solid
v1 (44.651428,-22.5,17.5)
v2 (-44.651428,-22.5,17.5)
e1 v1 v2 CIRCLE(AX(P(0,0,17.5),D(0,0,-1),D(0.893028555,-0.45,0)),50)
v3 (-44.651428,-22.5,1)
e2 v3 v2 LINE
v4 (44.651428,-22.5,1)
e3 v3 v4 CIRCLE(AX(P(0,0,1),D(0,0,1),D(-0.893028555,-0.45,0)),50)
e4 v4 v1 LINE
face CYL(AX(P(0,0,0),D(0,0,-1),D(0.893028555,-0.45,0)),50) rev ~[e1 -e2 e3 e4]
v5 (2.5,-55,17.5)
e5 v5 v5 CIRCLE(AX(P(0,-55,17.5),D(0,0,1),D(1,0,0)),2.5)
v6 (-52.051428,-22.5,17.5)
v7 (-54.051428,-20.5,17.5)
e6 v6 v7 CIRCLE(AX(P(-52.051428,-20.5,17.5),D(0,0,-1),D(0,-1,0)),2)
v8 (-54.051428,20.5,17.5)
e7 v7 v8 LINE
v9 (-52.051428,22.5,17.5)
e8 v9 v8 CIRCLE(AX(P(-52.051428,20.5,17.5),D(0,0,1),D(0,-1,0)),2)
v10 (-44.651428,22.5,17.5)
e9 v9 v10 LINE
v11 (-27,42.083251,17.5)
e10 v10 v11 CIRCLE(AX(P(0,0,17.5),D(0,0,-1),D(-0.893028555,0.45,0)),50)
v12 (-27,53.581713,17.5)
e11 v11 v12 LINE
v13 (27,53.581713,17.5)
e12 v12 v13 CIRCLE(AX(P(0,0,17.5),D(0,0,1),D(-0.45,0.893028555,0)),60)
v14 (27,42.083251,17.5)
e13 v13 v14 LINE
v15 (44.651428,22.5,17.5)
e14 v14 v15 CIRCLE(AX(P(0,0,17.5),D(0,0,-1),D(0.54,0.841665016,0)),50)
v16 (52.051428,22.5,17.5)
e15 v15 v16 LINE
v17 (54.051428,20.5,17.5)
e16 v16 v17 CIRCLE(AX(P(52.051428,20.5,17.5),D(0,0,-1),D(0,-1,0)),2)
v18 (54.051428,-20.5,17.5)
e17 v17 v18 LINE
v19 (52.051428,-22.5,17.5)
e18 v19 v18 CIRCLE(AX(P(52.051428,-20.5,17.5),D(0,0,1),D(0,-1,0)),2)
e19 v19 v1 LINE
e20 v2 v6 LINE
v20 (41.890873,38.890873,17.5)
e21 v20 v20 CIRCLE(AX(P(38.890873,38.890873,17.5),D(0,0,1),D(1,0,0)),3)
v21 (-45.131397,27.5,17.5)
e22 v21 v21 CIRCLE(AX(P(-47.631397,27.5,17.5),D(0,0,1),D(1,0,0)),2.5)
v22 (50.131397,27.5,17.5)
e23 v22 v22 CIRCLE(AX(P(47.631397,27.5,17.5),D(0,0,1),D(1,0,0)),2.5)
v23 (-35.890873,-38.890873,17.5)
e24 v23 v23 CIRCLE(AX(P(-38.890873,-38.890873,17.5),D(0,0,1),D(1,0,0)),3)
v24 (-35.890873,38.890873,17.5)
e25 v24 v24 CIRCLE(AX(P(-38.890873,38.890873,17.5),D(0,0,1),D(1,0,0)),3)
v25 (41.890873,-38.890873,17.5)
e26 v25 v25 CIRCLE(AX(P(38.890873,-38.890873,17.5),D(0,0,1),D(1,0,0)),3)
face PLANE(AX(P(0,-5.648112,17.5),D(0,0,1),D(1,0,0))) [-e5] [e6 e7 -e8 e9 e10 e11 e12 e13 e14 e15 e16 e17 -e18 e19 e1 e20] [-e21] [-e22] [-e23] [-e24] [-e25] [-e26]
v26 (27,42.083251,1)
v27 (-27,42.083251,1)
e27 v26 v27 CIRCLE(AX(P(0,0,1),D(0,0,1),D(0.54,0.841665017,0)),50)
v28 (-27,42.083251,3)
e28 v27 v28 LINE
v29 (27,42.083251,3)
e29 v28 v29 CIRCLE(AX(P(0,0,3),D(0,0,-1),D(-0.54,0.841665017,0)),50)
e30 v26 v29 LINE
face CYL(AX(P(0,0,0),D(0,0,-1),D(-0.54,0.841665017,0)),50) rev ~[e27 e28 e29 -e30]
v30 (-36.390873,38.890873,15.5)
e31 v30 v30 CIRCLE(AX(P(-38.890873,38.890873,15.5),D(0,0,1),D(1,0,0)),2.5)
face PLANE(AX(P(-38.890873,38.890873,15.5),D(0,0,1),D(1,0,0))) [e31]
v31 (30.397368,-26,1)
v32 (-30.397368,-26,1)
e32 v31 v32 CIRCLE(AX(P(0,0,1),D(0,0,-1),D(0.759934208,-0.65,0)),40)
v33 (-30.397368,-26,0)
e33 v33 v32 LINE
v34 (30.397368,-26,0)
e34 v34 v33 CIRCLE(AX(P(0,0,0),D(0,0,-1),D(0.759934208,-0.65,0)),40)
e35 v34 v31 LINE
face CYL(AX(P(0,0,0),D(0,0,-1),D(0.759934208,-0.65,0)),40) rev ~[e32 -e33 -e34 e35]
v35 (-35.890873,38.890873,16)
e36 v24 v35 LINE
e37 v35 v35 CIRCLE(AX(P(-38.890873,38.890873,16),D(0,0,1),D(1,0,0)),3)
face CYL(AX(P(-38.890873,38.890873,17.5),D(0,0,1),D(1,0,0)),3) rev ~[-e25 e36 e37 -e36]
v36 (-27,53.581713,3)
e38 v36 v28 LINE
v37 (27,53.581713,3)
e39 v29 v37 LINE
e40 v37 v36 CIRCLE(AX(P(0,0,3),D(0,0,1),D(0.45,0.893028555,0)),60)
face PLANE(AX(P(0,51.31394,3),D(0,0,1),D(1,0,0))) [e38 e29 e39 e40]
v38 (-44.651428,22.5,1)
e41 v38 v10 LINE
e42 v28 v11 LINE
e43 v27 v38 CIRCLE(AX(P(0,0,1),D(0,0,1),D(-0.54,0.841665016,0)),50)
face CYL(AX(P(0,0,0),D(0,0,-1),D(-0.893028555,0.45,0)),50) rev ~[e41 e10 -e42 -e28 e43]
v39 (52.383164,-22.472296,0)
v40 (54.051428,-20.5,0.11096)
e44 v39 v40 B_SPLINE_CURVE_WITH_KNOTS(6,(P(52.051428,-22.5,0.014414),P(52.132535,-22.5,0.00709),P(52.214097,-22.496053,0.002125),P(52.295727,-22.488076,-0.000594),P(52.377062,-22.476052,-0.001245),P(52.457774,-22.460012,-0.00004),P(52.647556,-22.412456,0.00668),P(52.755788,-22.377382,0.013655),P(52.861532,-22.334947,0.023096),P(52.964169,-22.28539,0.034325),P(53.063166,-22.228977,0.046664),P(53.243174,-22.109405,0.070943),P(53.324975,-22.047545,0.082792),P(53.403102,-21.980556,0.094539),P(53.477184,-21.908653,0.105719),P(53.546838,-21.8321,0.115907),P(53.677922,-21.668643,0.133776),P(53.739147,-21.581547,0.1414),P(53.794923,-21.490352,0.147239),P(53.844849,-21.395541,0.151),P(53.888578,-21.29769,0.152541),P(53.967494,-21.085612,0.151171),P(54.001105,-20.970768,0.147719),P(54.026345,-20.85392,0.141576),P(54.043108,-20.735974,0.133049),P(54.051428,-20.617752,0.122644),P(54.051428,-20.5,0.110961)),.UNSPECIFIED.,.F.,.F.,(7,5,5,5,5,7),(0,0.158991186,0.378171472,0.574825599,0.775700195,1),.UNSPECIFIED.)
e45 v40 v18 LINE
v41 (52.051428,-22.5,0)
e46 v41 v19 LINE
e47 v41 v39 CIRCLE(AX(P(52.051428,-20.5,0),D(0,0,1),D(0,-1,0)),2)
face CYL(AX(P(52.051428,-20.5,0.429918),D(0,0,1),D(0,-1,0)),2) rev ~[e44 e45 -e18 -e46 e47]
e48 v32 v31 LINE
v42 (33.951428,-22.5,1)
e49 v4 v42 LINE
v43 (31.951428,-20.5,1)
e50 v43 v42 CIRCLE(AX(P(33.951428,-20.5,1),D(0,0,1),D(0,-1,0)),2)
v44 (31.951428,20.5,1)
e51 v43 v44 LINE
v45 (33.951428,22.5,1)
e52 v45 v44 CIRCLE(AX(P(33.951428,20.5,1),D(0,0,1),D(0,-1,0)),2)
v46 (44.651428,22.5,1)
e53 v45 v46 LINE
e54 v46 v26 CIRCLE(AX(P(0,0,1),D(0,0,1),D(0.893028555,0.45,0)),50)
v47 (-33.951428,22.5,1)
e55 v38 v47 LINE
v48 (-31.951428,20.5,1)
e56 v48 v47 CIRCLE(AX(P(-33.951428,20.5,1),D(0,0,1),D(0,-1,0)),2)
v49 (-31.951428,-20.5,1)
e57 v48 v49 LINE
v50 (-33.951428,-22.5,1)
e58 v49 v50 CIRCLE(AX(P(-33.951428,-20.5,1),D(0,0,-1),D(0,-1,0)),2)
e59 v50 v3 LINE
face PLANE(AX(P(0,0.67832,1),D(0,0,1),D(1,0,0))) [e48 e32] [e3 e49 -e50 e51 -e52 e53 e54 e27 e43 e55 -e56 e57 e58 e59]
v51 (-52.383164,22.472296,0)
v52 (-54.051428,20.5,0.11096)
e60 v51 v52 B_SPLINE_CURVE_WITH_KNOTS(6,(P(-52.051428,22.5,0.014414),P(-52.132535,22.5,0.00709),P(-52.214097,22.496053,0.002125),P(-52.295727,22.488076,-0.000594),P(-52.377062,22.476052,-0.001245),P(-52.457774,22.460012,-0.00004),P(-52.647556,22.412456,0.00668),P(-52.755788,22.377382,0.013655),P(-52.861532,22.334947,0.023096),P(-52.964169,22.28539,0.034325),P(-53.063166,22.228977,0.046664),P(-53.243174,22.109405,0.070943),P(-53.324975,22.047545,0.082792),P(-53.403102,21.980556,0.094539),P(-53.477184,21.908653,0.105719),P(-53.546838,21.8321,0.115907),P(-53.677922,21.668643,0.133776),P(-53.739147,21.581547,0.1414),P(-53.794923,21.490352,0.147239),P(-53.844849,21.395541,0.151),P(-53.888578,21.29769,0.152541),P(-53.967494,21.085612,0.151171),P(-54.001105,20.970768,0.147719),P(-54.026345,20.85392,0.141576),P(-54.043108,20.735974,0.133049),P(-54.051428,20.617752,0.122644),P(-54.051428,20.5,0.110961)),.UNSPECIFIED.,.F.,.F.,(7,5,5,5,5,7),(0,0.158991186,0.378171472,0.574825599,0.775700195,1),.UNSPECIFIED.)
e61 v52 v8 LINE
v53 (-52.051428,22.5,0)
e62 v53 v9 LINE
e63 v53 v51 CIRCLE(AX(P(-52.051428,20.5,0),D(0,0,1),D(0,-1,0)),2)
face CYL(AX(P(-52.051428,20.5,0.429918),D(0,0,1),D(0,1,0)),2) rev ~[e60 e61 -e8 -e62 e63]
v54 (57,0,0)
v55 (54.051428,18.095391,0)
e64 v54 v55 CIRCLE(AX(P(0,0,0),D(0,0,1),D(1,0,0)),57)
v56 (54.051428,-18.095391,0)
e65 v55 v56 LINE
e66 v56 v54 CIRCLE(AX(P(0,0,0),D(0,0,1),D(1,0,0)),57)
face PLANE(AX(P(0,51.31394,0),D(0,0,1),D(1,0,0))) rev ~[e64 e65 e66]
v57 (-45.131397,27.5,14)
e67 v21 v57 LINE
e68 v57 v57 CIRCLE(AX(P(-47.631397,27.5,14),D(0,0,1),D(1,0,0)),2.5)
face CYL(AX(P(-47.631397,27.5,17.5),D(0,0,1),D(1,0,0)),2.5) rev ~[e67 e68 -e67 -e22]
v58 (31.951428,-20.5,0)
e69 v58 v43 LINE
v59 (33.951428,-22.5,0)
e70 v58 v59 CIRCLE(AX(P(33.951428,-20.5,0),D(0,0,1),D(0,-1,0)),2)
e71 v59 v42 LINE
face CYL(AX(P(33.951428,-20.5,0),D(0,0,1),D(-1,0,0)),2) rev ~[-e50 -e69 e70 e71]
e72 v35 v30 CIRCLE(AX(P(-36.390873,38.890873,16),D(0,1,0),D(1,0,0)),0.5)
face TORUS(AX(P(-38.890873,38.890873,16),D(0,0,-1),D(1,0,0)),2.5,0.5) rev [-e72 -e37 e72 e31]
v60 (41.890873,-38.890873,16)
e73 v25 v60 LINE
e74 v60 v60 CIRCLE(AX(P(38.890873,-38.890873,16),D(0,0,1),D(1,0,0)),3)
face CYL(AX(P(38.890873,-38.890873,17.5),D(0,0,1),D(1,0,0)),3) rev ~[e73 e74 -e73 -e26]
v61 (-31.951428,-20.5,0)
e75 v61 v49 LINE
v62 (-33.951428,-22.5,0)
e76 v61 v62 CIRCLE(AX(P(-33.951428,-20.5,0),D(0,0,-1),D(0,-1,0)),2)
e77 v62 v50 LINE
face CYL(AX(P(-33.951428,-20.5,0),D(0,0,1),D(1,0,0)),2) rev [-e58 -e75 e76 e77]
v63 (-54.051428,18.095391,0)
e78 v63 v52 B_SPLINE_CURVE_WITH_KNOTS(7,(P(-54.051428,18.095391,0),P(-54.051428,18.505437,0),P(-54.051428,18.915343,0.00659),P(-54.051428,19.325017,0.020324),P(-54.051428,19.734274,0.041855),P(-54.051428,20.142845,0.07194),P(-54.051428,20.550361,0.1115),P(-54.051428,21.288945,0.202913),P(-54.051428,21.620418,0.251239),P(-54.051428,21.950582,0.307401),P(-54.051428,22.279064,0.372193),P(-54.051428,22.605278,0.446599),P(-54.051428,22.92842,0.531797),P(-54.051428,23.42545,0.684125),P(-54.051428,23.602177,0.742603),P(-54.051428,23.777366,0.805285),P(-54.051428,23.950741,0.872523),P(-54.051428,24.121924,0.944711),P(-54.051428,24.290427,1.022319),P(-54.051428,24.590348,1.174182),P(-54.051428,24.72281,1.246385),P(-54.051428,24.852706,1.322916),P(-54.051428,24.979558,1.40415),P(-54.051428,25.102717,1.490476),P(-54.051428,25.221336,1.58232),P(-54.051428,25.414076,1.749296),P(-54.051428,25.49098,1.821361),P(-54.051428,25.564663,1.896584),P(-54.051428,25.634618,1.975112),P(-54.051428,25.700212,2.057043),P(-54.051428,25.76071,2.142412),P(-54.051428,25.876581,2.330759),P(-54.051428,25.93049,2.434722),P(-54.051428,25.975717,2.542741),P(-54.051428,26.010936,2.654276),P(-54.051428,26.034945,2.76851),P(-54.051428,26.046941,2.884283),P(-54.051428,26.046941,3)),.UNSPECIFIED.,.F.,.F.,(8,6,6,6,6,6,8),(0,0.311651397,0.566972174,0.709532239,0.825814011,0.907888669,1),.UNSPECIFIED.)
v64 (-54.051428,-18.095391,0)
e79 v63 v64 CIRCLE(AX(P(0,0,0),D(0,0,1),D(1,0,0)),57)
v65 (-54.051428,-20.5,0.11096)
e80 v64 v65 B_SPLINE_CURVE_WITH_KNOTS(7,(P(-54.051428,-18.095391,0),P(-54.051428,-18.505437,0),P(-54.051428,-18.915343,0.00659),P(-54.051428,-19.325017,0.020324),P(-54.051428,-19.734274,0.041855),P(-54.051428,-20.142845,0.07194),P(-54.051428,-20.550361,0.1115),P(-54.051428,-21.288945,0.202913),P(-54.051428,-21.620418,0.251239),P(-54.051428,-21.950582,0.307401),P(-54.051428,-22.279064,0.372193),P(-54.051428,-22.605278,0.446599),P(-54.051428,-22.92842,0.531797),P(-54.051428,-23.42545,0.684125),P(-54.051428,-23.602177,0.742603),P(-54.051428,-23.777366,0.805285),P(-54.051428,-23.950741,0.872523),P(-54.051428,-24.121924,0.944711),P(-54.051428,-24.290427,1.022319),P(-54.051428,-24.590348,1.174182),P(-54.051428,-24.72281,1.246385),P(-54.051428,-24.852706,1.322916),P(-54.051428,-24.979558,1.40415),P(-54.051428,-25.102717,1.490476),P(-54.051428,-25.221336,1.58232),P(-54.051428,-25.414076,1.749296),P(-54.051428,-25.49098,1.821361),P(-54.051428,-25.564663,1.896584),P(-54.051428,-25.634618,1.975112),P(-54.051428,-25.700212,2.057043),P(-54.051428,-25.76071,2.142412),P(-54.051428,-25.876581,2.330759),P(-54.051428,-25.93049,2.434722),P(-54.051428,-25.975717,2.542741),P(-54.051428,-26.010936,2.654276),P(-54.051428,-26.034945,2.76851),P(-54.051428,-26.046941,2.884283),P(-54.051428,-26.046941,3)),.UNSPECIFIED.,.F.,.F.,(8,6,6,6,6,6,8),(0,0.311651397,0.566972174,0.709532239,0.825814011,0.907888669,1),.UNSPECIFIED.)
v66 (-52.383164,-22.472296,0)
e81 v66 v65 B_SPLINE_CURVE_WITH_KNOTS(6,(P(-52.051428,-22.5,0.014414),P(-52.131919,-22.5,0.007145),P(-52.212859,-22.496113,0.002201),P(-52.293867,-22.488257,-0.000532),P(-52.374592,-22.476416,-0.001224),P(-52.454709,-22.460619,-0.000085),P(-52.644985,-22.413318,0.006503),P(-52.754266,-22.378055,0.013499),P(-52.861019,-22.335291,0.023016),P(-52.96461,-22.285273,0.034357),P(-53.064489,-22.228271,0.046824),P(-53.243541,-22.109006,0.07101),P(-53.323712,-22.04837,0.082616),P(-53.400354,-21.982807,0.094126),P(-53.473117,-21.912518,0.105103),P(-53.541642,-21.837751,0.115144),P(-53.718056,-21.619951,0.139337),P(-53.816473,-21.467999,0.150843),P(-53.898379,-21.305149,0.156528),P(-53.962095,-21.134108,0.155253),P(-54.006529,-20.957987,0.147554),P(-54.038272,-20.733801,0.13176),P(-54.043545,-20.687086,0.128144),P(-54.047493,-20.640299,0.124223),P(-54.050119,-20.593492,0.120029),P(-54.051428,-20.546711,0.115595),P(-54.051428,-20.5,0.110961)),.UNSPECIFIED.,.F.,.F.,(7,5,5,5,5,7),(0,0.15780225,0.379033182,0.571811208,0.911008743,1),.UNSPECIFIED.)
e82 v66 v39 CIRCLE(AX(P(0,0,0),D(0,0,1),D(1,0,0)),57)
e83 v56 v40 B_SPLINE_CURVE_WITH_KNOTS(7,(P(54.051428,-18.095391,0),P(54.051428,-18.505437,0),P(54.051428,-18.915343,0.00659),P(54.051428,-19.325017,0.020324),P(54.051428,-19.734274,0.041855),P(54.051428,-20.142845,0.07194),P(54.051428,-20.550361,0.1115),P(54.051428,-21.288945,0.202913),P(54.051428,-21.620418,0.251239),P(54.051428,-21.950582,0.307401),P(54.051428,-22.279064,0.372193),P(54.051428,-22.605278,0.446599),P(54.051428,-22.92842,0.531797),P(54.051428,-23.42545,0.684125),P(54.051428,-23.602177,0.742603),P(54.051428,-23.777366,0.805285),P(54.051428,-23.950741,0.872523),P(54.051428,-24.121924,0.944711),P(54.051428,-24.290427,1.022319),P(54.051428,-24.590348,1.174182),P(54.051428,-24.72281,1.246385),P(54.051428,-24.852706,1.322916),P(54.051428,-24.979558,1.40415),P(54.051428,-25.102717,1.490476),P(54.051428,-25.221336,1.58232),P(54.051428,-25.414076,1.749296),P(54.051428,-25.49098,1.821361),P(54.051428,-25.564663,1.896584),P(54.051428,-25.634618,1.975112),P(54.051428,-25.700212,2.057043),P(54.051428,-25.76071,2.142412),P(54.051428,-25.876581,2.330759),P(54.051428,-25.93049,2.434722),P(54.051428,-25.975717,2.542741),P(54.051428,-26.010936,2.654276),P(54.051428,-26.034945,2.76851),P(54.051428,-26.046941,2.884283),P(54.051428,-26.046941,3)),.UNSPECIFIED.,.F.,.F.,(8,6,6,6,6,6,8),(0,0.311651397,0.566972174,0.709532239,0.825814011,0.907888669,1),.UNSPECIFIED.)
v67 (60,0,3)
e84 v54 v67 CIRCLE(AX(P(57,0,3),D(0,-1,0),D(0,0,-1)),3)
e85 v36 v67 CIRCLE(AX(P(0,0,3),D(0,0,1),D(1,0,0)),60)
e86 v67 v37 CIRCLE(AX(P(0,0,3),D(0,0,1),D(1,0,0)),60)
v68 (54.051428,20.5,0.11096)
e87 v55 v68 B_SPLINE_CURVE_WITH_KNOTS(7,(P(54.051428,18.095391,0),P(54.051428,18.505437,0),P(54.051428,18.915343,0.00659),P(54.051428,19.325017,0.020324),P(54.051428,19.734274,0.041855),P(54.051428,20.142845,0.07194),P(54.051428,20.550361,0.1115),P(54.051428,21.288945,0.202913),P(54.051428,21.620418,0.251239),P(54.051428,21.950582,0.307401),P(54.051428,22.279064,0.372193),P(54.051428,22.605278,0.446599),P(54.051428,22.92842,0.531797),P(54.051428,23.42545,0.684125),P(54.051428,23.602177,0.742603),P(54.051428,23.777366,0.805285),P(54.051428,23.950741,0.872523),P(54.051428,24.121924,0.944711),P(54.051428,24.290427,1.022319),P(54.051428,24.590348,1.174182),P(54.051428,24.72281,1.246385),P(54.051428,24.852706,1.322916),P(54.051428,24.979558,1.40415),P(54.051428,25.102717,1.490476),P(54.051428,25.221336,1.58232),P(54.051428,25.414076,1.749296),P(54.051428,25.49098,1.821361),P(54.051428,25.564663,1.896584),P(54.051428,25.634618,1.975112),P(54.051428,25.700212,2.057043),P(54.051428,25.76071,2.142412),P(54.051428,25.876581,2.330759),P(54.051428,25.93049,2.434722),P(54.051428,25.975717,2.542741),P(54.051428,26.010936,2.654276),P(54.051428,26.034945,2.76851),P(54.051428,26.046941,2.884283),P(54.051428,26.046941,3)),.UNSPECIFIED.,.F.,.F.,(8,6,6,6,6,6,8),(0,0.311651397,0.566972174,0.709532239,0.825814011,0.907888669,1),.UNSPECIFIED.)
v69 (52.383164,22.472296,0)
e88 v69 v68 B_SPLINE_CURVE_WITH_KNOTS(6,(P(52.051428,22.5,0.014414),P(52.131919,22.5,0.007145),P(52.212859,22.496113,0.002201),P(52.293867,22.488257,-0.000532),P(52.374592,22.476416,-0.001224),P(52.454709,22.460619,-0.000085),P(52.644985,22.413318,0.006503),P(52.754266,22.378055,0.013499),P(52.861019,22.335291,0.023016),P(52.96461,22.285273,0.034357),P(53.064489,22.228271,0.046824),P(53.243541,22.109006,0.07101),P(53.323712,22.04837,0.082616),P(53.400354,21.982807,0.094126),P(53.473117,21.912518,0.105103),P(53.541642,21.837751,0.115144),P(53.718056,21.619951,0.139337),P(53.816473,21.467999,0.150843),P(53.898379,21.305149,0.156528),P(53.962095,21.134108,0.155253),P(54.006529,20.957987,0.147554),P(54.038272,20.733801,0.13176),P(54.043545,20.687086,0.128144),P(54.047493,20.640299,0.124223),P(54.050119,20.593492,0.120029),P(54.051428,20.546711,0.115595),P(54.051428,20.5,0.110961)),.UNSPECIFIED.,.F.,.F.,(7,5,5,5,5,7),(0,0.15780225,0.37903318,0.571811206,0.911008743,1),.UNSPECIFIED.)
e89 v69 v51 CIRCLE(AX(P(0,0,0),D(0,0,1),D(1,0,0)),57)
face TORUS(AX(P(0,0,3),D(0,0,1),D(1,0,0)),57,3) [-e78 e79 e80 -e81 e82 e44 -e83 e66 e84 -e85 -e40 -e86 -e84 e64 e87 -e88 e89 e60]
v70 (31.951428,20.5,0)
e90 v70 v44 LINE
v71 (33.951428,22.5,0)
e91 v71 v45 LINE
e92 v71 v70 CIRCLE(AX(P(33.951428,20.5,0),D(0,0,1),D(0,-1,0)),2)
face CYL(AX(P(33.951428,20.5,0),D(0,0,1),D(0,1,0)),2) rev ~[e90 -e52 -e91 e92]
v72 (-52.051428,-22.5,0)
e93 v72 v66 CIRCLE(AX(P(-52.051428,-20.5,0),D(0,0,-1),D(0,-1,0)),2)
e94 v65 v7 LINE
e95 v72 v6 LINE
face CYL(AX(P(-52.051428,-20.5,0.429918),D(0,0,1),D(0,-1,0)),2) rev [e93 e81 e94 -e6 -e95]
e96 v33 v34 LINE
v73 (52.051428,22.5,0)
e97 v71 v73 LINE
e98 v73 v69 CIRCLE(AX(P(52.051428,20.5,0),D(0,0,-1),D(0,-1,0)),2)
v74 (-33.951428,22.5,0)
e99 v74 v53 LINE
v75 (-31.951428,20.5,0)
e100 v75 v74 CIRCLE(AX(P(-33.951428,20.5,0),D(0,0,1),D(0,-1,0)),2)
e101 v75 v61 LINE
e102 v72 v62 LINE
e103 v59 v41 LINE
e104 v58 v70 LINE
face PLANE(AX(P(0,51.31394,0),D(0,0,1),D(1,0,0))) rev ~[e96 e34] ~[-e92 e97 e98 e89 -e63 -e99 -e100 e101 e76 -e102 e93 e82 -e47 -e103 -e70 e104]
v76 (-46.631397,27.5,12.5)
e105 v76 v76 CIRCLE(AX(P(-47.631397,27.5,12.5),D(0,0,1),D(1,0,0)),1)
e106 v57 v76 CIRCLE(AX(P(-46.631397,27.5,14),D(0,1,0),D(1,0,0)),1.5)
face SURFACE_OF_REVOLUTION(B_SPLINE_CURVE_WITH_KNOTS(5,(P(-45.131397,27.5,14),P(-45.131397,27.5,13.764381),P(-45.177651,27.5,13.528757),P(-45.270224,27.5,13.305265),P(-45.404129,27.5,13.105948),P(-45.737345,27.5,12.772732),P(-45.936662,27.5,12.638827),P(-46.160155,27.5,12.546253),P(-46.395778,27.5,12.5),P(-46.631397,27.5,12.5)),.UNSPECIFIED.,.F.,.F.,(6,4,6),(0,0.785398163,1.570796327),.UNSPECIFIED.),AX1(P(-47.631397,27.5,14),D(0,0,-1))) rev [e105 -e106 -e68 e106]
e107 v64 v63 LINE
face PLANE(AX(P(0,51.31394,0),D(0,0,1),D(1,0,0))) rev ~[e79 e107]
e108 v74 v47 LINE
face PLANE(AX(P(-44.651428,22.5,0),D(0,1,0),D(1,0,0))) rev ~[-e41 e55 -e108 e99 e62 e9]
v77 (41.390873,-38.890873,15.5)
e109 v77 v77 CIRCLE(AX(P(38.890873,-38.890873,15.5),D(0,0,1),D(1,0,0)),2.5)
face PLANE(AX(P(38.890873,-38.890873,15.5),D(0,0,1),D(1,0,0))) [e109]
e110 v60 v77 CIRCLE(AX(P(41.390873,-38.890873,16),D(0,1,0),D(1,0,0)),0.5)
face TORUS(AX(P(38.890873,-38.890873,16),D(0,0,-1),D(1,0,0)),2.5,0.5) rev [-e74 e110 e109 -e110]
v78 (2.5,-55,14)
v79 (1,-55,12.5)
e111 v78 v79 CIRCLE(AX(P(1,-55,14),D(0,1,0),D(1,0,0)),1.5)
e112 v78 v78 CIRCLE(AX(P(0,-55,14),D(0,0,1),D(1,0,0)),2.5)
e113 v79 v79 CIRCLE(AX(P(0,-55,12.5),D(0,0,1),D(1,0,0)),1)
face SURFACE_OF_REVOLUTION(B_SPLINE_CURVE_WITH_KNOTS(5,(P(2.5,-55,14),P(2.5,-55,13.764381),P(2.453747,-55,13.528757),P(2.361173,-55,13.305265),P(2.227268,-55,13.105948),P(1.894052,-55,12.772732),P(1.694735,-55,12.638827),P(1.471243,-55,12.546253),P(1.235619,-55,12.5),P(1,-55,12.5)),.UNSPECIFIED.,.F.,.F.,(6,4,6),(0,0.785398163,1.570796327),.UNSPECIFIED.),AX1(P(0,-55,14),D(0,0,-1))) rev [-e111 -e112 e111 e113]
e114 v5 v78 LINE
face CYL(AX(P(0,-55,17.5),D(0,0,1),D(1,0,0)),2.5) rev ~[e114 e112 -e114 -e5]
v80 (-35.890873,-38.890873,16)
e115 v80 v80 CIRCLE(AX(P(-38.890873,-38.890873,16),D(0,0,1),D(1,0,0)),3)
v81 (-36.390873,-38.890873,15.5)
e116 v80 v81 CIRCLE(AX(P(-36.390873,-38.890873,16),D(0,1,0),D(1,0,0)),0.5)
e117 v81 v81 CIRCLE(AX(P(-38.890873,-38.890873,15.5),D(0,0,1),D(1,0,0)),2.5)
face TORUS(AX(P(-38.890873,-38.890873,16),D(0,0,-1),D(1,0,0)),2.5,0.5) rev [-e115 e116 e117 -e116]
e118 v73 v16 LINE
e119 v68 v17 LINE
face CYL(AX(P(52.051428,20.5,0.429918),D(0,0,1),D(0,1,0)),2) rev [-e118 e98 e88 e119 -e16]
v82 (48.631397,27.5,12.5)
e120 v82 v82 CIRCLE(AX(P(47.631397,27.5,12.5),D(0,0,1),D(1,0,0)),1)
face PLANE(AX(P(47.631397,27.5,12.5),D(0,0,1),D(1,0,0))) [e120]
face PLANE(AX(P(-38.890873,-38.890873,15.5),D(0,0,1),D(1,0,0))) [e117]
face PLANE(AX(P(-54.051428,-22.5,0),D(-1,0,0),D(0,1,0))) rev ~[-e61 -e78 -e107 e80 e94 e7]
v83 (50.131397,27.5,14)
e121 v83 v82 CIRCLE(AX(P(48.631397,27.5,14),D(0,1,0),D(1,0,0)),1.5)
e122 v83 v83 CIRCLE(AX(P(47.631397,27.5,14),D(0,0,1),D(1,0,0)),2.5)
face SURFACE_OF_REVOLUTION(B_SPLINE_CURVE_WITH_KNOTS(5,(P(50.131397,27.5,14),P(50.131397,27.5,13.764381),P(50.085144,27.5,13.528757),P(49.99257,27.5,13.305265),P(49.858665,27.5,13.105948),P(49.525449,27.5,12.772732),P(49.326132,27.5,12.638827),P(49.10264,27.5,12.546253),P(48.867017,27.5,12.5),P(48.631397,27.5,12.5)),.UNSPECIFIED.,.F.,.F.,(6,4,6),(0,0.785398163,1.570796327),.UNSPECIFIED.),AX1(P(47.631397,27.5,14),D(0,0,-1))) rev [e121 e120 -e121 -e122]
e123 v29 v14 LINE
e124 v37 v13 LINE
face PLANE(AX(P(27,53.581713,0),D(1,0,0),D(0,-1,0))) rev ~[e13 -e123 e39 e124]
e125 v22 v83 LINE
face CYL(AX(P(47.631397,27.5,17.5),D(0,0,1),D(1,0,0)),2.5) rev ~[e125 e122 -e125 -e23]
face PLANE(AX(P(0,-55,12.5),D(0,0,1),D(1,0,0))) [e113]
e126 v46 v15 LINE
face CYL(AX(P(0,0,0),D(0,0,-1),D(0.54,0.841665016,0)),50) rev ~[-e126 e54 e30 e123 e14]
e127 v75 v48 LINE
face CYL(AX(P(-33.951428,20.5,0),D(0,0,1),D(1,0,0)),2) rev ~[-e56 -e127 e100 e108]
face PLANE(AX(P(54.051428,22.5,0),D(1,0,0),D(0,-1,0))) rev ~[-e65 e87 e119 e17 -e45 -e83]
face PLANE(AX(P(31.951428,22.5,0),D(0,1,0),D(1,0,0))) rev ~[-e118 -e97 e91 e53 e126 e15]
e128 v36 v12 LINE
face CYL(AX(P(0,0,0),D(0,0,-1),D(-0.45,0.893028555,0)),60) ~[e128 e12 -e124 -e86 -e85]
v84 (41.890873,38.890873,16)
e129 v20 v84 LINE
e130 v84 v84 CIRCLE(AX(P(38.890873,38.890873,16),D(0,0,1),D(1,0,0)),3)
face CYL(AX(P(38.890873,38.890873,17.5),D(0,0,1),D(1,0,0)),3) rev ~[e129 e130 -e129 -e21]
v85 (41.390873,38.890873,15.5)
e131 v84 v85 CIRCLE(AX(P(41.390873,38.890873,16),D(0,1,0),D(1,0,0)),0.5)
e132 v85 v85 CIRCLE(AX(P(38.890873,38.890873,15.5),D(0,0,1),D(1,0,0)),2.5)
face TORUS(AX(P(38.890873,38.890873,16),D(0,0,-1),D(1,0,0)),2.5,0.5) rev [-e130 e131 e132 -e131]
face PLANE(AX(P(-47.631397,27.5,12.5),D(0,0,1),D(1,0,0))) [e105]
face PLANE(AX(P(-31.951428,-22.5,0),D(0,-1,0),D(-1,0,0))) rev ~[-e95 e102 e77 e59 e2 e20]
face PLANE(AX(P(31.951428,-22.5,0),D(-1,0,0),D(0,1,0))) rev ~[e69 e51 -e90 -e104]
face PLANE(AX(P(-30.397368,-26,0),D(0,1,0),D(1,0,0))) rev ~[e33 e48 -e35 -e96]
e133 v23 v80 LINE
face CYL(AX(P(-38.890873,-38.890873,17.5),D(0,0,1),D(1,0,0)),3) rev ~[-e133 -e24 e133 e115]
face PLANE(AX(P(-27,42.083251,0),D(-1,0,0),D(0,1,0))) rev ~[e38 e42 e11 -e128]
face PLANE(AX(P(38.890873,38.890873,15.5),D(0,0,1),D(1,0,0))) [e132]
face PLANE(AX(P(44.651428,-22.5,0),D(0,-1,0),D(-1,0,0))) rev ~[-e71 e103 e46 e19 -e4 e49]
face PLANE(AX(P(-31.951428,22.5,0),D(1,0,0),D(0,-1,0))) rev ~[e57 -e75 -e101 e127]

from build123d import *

# Parameters (mm, degrees)
F1_DEPTH  = 17.5
F2_R      = 3
F3_DEPTH  = 2
F2_R_2    = 2.5
F4_DEPTH  = 5
F5_R      = 0.5
F6_R      = 1.5
F10_DEPTH = 1
F11_DEPTH = 3
F13_R     = 2


# Not quite as in the source:
# - a fillet or chamfer that OpenCascade refuses, or shapes differently, is made with other operations: its cross-section is extruded or revolved along the edge and cut away or added
# - a feature names something its author has since deleted; it is built from what else it names


with BuildPart() as f1:
    # F0 (on Top) → F1 (new body)
    with BuildSketch(Plane.XY):
        with BuildLine():
            ThreePointArc((-27, 53.5817132985), (-31.4642654451, -51.0881590978), (60, 0))
            ThreePointArc((60, 0), (51.0881590978, 31.4642654451), (27, 53.5817132985))
            Line((27, 53.5817132985), (27, 42.083250825))
            ThreePointArc((27, 42.083250825), (37.1397052065, 33.4759958354), (44.6514277487, 22.5))
            Line((44.6514277487, 22.5), (54.0514277487, 22.5))
            Line((54.0514277487, 22.5), (54.0514277487, -22.5))
            Line((54.0514277487, -22.5), (44.6514277487, -22.5))
            ThreePointArc((44.6514277487, -22.5), (0, -50), (-44.6514277487, -22.5))
            Line((-44.6514277487, -22.5), (-54.0514277487, -22.5))
            Line((-54.0514277487, -22.5), (-54.0514277487, 22.5))
            Line((-54.0514277487, 22.5), (-44.6514277487, 22.5))
            ThreePointArc((-44.6514277487, 22.5), (-37.1397052065, 33.4759958354), (-27, 42.083250825))
            Line((-27, 42.083250825), (-27, 53.5817132985))
        make_face()
    extrude(amount=F1_DEPTH)

    # F2 (on face) → F3 (cut)
    with BuildSketch(Plane.XY.offset(17.5)):
        with Locations((-38.8908729653, 38.8908729653)):
            Circle(F2_R)
        with Locations((38.8908729653, 38.8908729653)):
            Circle(F2_R)
        with Locations((38.8908729653, -38.8908729653)):
            Circle(F2_R)
        with Locations((-38.8908729653, -38.8908729653)):
            Circle(F2_R)
    extrude(amount=-F3_DEPTH, mode=Mode.SUBTRACT)

    # F2 (on face) → F4 (cut)
    with BuildSketch(Plane.XY.offset(17.5)):
        with Locations((0, -55)):
            Circle(F2_R_2)
        with Locations((47.6313972081, 27.5)):
            Circle(F2_R_2)
        with Locations((-47.6313972081, 27.5)):
            Circle(F2_R_2)
    extrude(amount=-F4_DEPTH, mode=Mode.SUBTRACT)

    # F5
    f5_edges = [f1.edges().sort_by_distance(p)[0] for p in [
        (35.890873, -38.890873, 15.5),
        (-41.890873, -38.890873, 15.5),
        (-41.890873, 38.890873, 15.5),
        (35.890873, 38.890873, 15.5),
    ]]
    fillet(f5_edges, radius=F5_R)

    # F6
    f6_edges = [f1.edges().sort_by_distance(p)[0] for p in [
        (-2.5, -55, 12.5),
        (45.131397, 27.5, 12.5),
        (-50.131397, 27.5, 12.5),
    ]]
    fillet(f6_edges, radius=F6_R)


with BuildPart() as f7_1:
    # F7: copy of F1
    add(f1.part)


with BuildPart() as f1_1:
    add(f1.part)

    # F0 (on Top) → F10 (join)
    with BuildSketch(Plane.XY):
        with BuildLine():
            ThreePointArc((44.6514277487, 22.5), (37.1397052065, 33.4759958354), (27, 42.083250825))
            ThreePointArc((27, 42.083250825), (0, 50), (-27, 42.083250825))
            ThreePointArc((-27, 42.083250825), (-37.1397052065, 33.4759958354), (-44.6514277487, 22.5))
            Line((-44.6514277487, 22.5), (-31.9514277487, 22.5))
            Line((-31.9514277487, 22.5), (-31.9514277487, -22.5))
            Line((-31.9514277487, -22.5), (-44.6514277487, -22.5))
            ThreePointArc((-44.6514277487, -22.5), (0, -50), (44.6514277487, -22.5))
            Line((44.6514277487, -22.5), (31.9514277487, -22.5))
            Line((31.9514277487, -22.5), (31.9514277487, 22.5))
            Line((31.9514277487, 22.5), (44.6514277487, 22.5))
        make_face()
        with BuildLine():
            Line((-30.3973683071, -26), (30.3973683071, -26))
            ThreePointArc((30.3973683071, -26), (0, -40), (-30.3973683071, -26))
        make_face(mode=Mode.SUBTRACT)
    extrude(amount=F10_DEPTH)

    # F0 (on Top) → F11 (join)
    with BuildSketch(Plane.XY):
        with BuildLine():
            Line((27, 42.083250825), (27, 53.5817132985))
            ThreePointArc((27, 53.5817132985), (0, 60), (-27, 53.5817132985))
            Line((-27, 53.5817132985), (-27, 42.083250825))
            ThreePointArc((-27, 42.083250825), (0, 50), (27, 42.083250825))
        make_face()
    extrude(amount=F11_DEPTH)

    # F12: fillet of radius 3 on 1 edges, made by hand

    # F12_s1 → F12_t2 (revolve, cut)
    with BuildSketch(Plane.XZ):
        with BuildLine():
            ThreePointArc((57, 0), (59.1213203436, 0.8786796564), (60, 3))
            Line((60, 3), (60, 0))
            Line((60, 0), (57, 0))
        make_face()
    revolve(axis=Axis((0, 0, 0), (0, 0, 1)), mode=Mode.SUBTRACT)

    # F13#2 (call 1 of 8: OpenCascade refuses the feature's edges together)
    f13_2_edges = [f1_1.edges().sort_by_distance(p)[0] for p in [
        (31.951428, 22.5, 0.5),
    ]]
    fillet(f13_2_edges, radius=F13_R)

    # F13#3 (call 2 of 8)
    f13_3_edges = [f1_1.edges().sort_by_distance(p)[0] for p in [
        (31.951428, -22.5, 0.5),
    ]]
    fillet(f13_3_edges, radius=F13_R)

    # F13#4 (call 3 of 8)
    f13_4_edges = [f1_1.edges().sort_by_distance(p)[0] for p in [
        (54.051428, -22.5, 8.964959),
    ]]
    fillet(f13_4_edges, radius=F13_R)

    # F13#6 (call 4 of 8)
    f13_6_edges = [f1_1.edges().sort_by_distance(p)[0] for p in [
        (-54.051428, -22.5, 8.964959),
    ]]
    fillet(f13_6_edges, radius=F13_R)

    # F13#7 (call 5 of 8)
    f13_7_edges = [f1_1.edges().sort_by_distance(p)[0] for p in [
        (-31.951428, 22.5, 0.5),
    ]]
    fillet(f13_7_edges, radius=F13_R)

    # F13#8 (call 6 of 8)
    f13_8_edges = [f1_1.edges().sort_by_distance(p)[0] for p in [
        (-31.951428, -22.5, 0.5),
    ]]
    fillet(f13_8_edges, radius=F13_R)

    # F13 (call 7 of 8)
    f13_edges = [f1_1.edges().sort_by_distance(p)[0] for p in [
        (54.051428, 22.5, 8.964959),
    ]]
    fillet(f13_edges, radius=F13_R)

    # F13#5 (call 8 of 8)
    f13_5_edges = [f1_1.edges().sort_by_distance(p)[0] for p in [
        (-54.051428, 22.5, 8.964959),
    ]]
    fillet(f13_5_edges, radius=F13_R)


solid = f1_1.part
